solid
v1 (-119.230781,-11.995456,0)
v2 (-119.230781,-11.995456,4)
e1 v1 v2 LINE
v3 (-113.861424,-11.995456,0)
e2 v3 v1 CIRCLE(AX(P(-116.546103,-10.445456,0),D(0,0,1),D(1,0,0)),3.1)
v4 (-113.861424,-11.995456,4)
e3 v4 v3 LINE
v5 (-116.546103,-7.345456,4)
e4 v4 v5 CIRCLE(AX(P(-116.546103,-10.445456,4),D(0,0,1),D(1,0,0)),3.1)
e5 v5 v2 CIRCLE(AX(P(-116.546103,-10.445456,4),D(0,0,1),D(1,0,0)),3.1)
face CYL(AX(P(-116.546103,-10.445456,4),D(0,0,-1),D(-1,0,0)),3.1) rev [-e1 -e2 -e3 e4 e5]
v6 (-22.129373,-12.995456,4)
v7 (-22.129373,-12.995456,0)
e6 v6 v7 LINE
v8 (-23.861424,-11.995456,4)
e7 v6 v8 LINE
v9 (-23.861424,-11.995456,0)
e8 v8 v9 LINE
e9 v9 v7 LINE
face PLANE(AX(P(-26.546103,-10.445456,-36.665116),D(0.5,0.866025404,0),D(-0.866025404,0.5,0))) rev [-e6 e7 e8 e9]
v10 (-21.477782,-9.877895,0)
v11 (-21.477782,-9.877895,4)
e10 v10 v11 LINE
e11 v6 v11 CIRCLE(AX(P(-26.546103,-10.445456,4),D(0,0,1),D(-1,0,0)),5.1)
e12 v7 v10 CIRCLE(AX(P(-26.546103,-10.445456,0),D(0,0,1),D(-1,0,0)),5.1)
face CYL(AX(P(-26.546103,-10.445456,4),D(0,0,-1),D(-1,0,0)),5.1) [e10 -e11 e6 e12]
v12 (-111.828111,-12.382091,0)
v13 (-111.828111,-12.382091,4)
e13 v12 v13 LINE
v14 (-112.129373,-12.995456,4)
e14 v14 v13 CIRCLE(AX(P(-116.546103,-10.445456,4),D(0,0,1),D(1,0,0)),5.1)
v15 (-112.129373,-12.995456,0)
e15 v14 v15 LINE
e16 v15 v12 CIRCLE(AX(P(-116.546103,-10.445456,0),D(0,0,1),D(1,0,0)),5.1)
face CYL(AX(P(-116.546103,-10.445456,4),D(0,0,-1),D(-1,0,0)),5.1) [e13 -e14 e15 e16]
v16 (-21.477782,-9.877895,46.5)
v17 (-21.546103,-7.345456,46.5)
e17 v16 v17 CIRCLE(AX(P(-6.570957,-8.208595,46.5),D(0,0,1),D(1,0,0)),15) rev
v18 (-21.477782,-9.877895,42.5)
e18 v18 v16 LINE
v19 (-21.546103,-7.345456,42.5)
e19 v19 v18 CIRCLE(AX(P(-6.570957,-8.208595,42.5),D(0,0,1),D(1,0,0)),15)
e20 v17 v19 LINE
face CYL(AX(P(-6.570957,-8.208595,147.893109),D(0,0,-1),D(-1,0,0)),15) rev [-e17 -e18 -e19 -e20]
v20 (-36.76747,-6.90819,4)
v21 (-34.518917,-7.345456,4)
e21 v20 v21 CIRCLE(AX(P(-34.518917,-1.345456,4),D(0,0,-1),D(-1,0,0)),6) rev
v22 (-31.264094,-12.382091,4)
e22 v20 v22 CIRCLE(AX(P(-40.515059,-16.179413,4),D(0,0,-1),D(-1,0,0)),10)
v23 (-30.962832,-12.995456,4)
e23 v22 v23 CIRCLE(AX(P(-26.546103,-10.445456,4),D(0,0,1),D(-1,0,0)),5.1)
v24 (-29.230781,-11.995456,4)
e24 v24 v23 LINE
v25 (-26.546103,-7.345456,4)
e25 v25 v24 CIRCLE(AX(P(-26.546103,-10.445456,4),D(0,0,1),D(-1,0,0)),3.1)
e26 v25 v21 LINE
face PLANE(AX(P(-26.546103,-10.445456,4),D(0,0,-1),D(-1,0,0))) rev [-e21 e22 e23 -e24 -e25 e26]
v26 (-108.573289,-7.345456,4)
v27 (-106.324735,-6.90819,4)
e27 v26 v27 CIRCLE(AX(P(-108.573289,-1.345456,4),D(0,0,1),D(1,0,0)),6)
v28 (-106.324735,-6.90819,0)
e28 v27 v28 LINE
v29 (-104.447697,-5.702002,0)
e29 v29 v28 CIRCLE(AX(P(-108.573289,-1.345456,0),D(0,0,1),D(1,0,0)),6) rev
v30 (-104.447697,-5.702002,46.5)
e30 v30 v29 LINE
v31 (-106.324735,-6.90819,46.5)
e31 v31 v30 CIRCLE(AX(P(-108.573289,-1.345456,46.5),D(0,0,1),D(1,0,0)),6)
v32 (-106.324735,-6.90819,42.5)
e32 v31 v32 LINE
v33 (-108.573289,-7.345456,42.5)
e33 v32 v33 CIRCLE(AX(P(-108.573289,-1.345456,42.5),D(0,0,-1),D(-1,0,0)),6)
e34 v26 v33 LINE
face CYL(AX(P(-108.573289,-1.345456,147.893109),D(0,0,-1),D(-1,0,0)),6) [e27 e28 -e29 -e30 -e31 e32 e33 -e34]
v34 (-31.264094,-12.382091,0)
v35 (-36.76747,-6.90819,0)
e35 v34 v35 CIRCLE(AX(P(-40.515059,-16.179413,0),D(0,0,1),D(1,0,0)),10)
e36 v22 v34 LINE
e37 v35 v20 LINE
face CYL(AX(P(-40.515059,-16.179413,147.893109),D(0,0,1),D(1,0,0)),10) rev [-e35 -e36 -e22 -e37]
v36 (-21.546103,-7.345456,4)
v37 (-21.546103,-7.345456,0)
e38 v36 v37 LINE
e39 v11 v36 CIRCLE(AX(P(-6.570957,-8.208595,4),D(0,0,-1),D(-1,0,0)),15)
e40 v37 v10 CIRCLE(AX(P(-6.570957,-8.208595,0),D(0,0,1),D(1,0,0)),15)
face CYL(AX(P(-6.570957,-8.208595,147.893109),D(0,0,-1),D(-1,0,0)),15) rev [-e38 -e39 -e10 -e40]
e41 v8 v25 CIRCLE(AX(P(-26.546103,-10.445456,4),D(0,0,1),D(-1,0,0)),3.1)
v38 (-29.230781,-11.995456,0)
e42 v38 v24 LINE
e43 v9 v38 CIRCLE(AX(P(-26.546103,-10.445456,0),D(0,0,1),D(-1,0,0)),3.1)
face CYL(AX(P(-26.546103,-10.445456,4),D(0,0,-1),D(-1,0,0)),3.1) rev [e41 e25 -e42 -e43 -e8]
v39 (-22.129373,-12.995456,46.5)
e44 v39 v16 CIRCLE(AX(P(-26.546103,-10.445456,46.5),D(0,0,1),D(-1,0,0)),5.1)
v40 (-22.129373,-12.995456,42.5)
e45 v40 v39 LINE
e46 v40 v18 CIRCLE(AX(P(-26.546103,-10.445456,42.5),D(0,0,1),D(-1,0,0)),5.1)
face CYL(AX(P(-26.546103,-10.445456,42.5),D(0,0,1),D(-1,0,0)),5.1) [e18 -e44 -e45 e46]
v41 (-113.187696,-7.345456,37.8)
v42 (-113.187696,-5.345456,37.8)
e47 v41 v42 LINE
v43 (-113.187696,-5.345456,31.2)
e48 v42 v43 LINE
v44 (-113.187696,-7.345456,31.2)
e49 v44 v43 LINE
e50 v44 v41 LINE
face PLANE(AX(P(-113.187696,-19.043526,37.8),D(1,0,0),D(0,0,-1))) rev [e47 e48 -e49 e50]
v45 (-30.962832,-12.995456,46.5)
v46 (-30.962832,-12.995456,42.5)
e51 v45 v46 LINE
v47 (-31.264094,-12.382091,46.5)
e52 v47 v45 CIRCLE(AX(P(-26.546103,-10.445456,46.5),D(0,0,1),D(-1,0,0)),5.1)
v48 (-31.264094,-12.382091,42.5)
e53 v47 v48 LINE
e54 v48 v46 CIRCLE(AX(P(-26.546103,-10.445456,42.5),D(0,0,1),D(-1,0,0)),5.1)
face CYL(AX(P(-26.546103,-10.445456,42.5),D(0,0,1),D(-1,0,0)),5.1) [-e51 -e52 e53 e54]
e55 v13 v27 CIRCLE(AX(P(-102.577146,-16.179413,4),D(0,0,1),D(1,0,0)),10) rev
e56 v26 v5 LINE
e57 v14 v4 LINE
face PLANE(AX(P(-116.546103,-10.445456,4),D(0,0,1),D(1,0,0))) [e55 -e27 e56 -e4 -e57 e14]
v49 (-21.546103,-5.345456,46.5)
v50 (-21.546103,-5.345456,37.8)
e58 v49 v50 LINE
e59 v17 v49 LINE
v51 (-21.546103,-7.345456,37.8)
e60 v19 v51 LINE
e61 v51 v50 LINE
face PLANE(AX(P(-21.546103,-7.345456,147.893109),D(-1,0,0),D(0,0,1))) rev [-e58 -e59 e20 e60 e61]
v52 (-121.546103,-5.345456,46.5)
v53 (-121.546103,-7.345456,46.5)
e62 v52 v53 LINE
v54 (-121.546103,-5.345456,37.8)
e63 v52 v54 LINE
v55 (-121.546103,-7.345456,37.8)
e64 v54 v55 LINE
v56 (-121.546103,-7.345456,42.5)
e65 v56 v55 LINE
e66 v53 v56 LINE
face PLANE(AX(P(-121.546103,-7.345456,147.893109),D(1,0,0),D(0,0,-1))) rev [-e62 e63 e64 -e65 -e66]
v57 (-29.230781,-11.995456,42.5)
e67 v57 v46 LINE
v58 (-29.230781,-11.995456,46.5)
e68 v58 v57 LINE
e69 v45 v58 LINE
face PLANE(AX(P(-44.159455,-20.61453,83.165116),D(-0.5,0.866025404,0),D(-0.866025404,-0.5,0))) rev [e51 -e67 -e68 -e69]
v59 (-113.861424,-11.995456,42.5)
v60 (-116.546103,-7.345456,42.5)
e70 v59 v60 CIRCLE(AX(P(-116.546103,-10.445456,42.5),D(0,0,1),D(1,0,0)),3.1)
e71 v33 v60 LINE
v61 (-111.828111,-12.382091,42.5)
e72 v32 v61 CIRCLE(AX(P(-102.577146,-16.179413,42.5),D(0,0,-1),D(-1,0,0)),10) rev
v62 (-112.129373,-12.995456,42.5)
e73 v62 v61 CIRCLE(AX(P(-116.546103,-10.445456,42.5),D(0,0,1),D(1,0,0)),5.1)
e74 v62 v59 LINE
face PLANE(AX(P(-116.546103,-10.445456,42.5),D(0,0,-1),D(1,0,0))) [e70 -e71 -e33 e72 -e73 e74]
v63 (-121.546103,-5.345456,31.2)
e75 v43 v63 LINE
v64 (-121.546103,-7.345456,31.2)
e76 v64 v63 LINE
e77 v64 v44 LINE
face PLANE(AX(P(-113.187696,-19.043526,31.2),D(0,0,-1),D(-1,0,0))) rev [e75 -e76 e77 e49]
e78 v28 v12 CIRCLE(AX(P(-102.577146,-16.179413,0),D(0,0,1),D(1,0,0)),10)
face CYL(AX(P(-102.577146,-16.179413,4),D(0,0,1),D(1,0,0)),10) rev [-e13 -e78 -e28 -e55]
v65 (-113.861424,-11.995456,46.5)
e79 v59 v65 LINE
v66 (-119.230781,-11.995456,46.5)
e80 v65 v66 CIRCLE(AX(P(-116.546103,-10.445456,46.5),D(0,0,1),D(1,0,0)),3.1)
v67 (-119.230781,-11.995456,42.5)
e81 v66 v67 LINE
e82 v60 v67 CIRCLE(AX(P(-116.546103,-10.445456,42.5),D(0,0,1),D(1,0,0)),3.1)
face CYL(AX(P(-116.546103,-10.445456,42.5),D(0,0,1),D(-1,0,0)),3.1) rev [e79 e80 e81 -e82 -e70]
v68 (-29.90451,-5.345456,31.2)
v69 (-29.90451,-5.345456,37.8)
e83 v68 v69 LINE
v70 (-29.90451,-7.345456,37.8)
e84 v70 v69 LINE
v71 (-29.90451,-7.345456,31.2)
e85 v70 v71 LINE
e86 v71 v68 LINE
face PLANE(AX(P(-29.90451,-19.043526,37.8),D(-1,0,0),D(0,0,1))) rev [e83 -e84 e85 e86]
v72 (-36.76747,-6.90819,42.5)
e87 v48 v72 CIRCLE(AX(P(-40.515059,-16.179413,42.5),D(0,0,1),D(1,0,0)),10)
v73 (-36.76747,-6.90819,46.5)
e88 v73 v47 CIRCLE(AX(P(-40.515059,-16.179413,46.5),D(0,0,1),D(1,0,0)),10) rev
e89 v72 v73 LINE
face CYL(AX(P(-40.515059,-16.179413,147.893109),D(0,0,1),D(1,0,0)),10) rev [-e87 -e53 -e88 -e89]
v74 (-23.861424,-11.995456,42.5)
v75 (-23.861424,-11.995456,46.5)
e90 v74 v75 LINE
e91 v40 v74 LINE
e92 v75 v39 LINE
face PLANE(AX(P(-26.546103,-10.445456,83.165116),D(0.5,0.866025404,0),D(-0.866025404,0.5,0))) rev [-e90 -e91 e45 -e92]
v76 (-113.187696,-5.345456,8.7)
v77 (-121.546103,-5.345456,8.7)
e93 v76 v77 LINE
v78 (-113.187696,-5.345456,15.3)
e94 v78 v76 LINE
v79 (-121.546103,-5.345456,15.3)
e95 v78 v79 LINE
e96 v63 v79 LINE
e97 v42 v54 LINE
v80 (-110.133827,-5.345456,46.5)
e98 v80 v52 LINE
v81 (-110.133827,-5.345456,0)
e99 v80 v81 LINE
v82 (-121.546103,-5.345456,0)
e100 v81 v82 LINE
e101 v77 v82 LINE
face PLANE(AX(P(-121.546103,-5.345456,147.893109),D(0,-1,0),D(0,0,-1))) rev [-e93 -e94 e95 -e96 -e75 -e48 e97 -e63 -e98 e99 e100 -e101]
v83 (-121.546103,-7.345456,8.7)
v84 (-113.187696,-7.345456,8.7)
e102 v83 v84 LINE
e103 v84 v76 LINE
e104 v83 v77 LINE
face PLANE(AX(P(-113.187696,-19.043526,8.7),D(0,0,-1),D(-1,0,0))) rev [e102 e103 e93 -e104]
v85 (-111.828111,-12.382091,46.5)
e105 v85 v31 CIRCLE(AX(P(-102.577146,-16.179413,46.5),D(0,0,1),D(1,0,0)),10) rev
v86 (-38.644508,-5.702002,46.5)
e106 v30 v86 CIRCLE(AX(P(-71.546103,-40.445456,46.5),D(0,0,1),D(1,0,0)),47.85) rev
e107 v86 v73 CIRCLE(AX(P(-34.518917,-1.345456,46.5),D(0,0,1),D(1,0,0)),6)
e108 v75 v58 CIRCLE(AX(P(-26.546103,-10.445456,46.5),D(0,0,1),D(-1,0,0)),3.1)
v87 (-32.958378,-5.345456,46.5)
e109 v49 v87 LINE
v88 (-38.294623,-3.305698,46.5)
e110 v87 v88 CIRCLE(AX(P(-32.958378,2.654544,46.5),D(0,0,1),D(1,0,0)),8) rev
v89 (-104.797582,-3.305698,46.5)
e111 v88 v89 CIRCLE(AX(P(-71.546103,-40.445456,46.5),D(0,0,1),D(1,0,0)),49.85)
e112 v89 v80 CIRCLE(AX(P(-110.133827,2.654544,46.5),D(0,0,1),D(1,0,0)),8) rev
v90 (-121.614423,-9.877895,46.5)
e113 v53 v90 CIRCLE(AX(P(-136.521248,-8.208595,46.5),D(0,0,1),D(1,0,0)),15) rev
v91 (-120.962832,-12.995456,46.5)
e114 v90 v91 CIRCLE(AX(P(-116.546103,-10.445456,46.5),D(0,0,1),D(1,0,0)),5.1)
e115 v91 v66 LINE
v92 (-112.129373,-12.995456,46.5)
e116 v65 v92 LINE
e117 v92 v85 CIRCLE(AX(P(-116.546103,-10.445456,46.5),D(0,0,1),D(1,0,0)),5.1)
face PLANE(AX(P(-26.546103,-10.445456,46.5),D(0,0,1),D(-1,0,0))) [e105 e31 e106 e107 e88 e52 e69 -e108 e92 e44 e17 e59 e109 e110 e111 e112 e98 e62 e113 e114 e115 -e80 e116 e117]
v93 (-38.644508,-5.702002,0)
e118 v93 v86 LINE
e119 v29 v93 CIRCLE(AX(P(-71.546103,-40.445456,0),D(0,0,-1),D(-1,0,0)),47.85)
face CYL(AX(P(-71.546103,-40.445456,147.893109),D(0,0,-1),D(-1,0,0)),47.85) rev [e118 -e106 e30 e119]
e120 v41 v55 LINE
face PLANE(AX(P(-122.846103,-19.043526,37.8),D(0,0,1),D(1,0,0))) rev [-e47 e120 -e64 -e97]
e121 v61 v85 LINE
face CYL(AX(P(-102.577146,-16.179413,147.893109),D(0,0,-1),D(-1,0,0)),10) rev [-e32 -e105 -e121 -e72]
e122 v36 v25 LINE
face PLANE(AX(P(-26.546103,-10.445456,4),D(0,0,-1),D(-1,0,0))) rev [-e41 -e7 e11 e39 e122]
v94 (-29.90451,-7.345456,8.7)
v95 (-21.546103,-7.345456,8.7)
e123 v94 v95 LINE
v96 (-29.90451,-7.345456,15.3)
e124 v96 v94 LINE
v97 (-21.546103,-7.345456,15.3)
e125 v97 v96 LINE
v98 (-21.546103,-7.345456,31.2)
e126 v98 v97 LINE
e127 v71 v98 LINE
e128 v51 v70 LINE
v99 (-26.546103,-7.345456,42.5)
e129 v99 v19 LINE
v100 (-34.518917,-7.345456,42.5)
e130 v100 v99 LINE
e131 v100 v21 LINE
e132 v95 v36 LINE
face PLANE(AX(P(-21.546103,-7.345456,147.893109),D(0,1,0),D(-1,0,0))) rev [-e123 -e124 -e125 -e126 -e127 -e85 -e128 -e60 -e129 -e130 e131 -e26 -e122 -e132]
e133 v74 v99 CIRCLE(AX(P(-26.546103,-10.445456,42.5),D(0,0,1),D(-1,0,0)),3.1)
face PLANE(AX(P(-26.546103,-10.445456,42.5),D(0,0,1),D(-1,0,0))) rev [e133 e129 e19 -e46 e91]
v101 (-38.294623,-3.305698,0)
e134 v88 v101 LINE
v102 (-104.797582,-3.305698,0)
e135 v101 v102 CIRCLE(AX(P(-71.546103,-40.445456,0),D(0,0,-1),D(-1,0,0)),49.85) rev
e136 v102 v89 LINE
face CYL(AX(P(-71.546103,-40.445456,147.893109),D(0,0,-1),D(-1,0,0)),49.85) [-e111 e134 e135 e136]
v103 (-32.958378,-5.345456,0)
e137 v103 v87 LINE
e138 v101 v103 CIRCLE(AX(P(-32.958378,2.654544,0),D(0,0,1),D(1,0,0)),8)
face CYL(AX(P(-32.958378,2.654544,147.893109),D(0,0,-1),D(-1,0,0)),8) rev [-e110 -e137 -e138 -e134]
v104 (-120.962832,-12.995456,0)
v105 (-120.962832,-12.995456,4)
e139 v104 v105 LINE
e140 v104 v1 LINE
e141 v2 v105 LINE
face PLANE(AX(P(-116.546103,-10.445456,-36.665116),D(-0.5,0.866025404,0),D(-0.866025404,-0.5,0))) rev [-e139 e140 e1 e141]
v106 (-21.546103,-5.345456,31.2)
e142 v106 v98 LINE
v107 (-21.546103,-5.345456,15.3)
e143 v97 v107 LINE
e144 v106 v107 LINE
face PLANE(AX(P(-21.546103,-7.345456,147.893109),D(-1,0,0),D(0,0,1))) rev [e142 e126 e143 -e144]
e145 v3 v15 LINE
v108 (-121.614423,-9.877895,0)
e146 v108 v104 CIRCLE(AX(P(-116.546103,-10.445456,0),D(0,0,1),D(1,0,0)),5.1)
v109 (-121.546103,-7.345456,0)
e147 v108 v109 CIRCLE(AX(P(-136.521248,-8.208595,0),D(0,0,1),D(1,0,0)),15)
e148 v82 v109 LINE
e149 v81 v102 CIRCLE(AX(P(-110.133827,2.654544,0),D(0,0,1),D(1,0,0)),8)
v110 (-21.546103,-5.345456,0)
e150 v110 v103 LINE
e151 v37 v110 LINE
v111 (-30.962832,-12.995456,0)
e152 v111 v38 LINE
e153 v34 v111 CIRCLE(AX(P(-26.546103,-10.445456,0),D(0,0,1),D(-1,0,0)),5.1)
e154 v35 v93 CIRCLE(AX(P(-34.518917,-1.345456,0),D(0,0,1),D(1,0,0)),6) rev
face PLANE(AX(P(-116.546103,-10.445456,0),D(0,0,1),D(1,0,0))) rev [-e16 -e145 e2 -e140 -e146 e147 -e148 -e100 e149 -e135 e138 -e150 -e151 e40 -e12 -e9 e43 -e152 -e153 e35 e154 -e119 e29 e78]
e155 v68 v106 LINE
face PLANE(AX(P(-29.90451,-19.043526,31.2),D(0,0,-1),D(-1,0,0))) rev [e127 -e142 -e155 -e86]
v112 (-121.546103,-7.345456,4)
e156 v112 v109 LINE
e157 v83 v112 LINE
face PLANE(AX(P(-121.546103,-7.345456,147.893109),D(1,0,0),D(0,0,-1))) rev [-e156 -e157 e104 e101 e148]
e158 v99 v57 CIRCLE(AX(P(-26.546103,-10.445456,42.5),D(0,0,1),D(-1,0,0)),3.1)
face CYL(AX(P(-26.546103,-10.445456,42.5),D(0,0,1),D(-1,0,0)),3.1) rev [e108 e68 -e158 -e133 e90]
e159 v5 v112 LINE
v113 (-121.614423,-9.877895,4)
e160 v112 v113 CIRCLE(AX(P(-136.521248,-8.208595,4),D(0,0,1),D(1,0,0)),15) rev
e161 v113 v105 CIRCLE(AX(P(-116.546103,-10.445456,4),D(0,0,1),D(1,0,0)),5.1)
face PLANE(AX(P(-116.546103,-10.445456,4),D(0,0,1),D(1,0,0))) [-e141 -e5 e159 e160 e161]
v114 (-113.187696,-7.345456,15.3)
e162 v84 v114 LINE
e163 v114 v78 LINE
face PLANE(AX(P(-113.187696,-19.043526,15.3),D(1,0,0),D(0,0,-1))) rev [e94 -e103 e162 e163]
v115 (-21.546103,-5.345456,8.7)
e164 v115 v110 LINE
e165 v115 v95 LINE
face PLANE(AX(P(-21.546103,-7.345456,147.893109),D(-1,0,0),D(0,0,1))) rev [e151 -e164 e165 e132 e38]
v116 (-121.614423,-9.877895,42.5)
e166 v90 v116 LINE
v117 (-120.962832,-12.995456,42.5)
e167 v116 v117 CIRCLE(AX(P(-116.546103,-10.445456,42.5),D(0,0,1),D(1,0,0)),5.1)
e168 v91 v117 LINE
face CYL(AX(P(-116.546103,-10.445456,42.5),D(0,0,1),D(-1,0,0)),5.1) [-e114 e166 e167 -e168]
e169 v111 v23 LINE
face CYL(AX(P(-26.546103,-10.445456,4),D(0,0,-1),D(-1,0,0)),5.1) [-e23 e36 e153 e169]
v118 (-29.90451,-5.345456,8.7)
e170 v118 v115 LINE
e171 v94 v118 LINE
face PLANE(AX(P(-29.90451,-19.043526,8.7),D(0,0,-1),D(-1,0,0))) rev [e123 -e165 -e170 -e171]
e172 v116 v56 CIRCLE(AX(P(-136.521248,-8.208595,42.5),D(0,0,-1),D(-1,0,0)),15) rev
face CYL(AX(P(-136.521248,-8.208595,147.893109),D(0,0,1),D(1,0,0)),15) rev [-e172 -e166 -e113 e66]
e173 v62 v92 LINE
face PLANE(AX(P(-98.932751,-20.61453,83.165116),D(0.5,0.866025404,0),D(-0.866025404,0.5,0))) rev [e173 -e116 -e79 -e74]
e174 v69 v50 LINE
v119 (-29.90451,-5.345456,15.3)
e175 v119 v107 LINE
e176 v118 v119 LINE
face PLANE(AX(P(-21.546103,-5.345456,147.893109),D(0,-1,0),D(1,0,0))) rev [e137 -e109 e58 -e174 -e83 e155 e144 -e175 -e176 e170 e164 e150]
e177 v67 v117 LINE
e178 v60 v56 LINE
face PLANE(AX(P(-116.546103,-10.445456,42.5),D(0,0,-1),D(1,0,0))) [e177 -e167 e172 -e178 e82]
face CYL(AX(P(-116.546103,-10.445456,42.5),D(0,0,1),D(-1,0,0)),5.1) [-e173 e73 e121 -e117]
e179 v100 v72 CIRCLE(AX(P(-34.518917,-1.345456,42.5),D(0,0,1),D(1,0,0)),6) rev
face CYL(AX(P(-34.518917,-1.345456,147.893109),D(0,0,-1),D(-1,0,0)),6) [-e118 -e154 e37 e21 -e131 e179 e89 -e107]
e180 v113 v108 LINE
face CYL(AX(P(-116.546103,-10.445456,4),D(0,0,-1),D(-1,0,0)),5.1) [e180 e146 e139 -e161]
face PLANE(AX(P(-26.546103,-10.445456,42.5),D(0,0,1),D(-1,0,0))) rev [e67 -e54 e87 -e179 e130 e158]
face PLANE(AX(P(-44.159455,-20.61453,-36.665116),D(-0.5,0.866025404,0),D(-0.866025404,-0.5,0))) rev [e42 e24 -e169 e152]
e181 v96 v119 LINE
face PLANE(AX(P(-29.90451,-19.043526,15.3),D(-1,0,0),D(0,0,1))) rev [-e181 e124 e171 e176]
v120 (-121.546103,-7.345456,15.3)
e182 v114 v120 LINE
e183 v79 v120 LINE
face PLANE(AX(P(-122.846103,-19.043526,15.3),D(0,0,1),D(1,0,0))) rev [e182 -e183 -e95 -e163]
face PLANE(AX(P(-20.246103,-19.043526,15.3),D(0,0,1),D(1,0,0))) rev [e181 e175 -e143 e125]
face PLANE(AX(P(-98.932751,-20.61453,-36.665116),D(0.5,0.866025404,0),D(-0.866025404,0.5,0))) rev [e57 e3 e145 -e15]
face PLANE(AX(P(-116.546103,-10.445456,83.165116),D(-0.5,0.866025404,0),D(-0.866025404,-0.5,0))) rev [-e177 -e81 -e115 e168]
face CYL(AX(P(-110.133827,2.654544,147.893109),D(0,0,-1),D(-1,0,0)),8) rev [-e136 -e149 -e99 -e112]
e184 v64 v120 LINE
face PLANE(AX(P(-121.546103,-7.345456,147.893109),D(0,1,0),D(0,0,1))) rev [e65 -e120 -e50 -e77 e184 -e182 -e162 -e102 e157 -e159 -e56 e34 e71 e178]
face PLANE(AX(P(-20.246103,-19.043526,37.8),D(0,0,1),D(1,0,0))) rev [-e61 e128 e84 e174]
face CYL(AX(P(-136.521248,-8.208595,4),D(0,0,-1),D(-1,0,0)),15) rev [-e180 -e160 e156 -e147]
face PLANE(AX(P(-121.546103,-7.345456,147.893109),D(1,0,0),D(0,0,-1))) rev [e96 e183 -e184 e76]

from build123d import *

# Parameters (mm, degrees)
SKETCH3_R             = 5.1
SKETCH3_R_2           = 3.1
BOSS_EXTRUDE2_DEPTH   = 4
BOSS_EXTRUDE2_2_DEPTH = 4
CUT_EXTRUDE1_DEPTH    = 4
BOSS_EXTRUDE3_START   = -23.25
BOSS_EXTRUDE3_DEPTH   = 46.5
SKETCH7_W             = 9.658407056
SKETCH7_H             = 6.6
CUT_EXTRUDE2_DEPTH    = 2
FILLET1_R             = 8
FILLET2_R             = 6
FILLET3_R             = 10
FILLET4_R             = 15


with BuildPart() as part:
    # Sketch3 → Boss-Extrude2 (new body)
    with BuildSketch(Plane.XY):
        with Locations((-116.546102611, -10.445456474)):
            Circle(SKETCH3_R)
        with Locations((-116.546102611, -10.445456474)):
            Circle(SKETCH3_R_2, mode=Mode.SUBTRACT)
    extrude(amount=BOSS_EXTRUDE2_DEPTH)


with BuildPart() as body_2:
    # Sketch3 → Boss-Extrude2 2 (new body)
    with BuildSketch(Plane.XY):
        with Locations(Location((-26.546102611, -10.445456474, 0), (0, 0, 180))):
            Circle(SKETCH3_R)
        with Locations(Location((-26.546102611, -10.445456474, 0), (0, 0, 180))):
            Circle(SKETCH3_R_2, mode=Mode.SUBTRACT)
    extrude(amount=BOSS_EXTRUDE2_2_DEPTH)


with BuildPart() as cut_extrude1_tool:
    # Sketch4 → Cut-Extrude1 (new body)
    with BuildSketch(Plane.XY.offset(4)):
        Polygon((-116.546102611, -10.445456474), (-134.15945469, -20.614530038), (-98.932750532, -20.614530038), align=None)
        Polygon((-26.546102611, -10.445456474), (-8.932750532, -20.614530038), (-44.15945469, -20.614530038), align=None)
    extrude(amount=-CUT_EXTRUDE1_DEPTH)


with BuildPart() as part_1:
    add(part.part)

    # Cut-Extrude1: cut by cut_extrude1_tool
    add(cut_extrude1_tool.part, mode=Mode.SUBTRACT)


with BuildPart() as body_2_1:
    add(body_2.part)

    # Cut-Extrude1: cut by cut_extrude1_tool
    add(cut_extrude1_tool.part, mode=Mode.SUBTRACT)


with BuildPart() as body_3:
    # Mirror2: mirrored copy
    add(part_1.part.mirror(Plane.XY.offset(23.25)))


with BuildPart() as body_4:
    # Mirror2 2: mirrored copy
    add(body_2_1.part.mirror(Plane.XY.offset(23.25)))


with BuildPart() as part_2:
    add(part_1.part)

    add(body_2_1.part)  # Boss-Extrude3 merges body 2

    add(body_3.part)  # Boss-Extrude3 merges body 3

    add(body_4.part)  # Boss-Extrude3 merges body 4
    # Sketch6 → Boss-Extrude3 (add)
    with BuildSketch(Plane.XY.offset(23.25).offset(BOSS_EXTRUDE3_START)):
        with BuildLine():
            Line((-121.546102611, -7.345456474), (-106.100588572, -7.345456474))
            ThreePointArc((-106.100588572, -7.345456474), (-71.546102611, 7.404543526), (-36.99161665, -7.345456474))
            Line((-36.99161665, -7.345456474), (-21.546102611, -7.345456474))
            Line((-21.546102611, -7.345456474), (-21.546102611, -5.345456474))
            Line((-21.546102611, -5.345456474), (-36.148186006, -5.345456474))
            ThreePointArc((-36.148186006, -5.345456474), (-71.546102611, 9.404543526), (-106.944019216, -5.345456474))
            Line((-106.944019216, -5.345456474), (-121.546102611, -5.345456474))
            Line((-121.546102611, -5.345456474), (-121.546102611, -7.345456474))
        make_face()
    extrude(amount=BOSS_EXTRUDE3_DEPTH)

    # Sketch7 → Cut-Extrude2 (cut)
    with BuildSketch(Plane(origin=(0, -5.345456474, 0), x_dir=(1, 0, 0), z_dir=(0, 1, 0))):
        with Locations((-118.016899083, -12)):
            Rectangle(SKETCH7_W, SKETCH7_H)
        with Locations((-118.016899083, -34.5)):
            Rectangle(SKETCH7_W, SKETCH7_H)
        with Locations((-25.075306139, -34.5)):
            Rectangle(SKETCH7_W, SKETCH7_H)
        with Locations((-25.075306139, -12)):
            Rectangle(SKETCH7_W, SKETCH7_H)
    extrude(amount=-CUT_EXTRUDE2_DEPTH, mode=Mode.SUBTRACT)

    # Fillet1
    fillet1_edges = [part_2.edges().sort_by_distance(p)[0] for p in [
        (-36.148186006, -5.345456474, 23.25),
        (-106.944019216, -5.345456474, 23.25),
    ]]
    fillet(fillet1_edges, radius=FILLET1_R)

    # Fillet2
    fillet2_edges = [part_2.edges().sort_by_distance(p)[0] for p in [
        (-106.100588572, -7.345456474, 23.25),
        (-36.99161665, -7.345456474, 23.25),
    ]]
    fillet(fillet2_edges, radius=FILLET2_R)

    # Fillet3
    # the kernel refuses this fillet: 10 mm, written as the material it adds along each edge
    with BuildSketch(Plane(origin=(-112.496411265, -7.345456474, 4), x_dir=(0.9974995155199412, 0.07067330852226088, 0), z_dir=(0, 0, -1)), Plane(origin=(-30.595793957, -7.345456474, 42.5), x_dir=(-0.9974995155199468, 0.07067330852218129, 0), z_dir=(0, 0, 1))) as fillet3_piece_1:
        with BuildLine():
            CenterArc((9.270136929, 9.512895054), FILLET3_R, 206.369759274, 45.673490189)
            Line((0.310673789, 5.07127145), (-0.585272525, 4.62710909))
            ThreePointArc((-0.585272525, 4.62710909), (-0.16632442, 2.555341186), (-0.835029885, 0.550204591))
            Line((-0.835029885, 0.550204591), (0.070673309, -0.997499516))
            ThreePointArc((0.070673309, -0.997499516), (3.983986296, -0.720239455), (5.878847867, -0.951289505))
            Line((5.878847867, -0.951289505), (6.187146873, 0))
        make_face()
    extrude(amount=4)
    with BuildSketch(Plane(origin=(-112.496411265, -7.345456474, 42.5), x_dir=(0.9974995155199412, 0.07067330852226088, 0), z_dir=(0, 0, 1)), Plane(origin=(-30.595793957, -7.345456474, 4), x_dir=(-0.9974995155199468, 0.07067330852218129, 0), z_dir=(0, 0, -1))) as fillet3_piece_2:
        with BuildLine():
            CenterArc((9.270136929, -9.512895054), FILLET3_R, 107.956750537, 45.673490189)
            Line((0.310673789, -5.07127145), (-0.585272525, -4.62710909))
            ThreePointArc((-0.585272525, -4.62710909), (-0.16632442, -2.555341186), (-0.835029885, -0.550204591))
            Line((-0.835029885, -0.550204591), (0.070673309, 0.997499516))
            ThreePointArc((0.070673309, 0.997499516), (3.983986296, 0.720239455), (5.878847867, 0.951289505))
            Line((5.878847867, 0.951289505), (6.187146873, 0))
        make_face()
    extrude(amount=4)

    # Fillet4
    # the kernel refuses this fillet: 15 mm, written as the material it adds along each edge
    with BuildSketch(Plane(origin=(-120.595793957, -7.345456474, 4), x_dir=(-0.37317563120438824, -0.9277607171438153, 0), z_dir=(0, 0, -1)), Plane(origin=(-22.496411265, -7.345456474, 42.5), x_dir=(0.3731756312044104, -0.9277607171438064, 0), z_dir=(0, 0, 1))) as fillet4_piece_1:
        with BuildLine():
            CenterArc((6.743777429, 14.452908836), FILLET4_R, 244.789631476, 9.688258422)
            Line((0.354632032, 0.881659038), (0, 0))
            ThreePointArc((0, 0), (1.364812099, 0.186010996), (2.729624198, 0))
        make_face()
    extrude(amount=4)
    with BuildSketch(Plane(origin=(-120.595793957, -7.345456474, 42.5), x_dir=(-0.37317563120438824, -0.9277607171438153, 0), z_dir=(0, 0, 1))) as fillet4_piece_2:
        with BuildLine():
            CenterArc((6.743777429, -14.452908836), FILLET4_R, 105.522110102, 9.688258422)
            Line((0.354632032, -0.881659038), (0, 0))
            ThreePointArc((0, 0), (1.364812099, -0.186010996), (2.729624198, 0))
        make_face()
    extrude(amount=4)
    with BuildSketch(Plane(origin=(-22.496411265, -7.345456474, 4), x_dir=(1, 0, 0), z_dir=(0, 0, -1))) as fillet4_piece_3:
        with BuildLine():
            CenterArc((15.925454466, 0.863138406), FILLET4_R, 173.610509594, 9.688258422)
            ThreePointArc((1.018629233, 2.532438103), (0.681888311, 1.196804281), (0, 0))
            Line((0, 0), (0.950308654, 0))
        make_face()
    extrude(amount=4)


solid = part_2.part
